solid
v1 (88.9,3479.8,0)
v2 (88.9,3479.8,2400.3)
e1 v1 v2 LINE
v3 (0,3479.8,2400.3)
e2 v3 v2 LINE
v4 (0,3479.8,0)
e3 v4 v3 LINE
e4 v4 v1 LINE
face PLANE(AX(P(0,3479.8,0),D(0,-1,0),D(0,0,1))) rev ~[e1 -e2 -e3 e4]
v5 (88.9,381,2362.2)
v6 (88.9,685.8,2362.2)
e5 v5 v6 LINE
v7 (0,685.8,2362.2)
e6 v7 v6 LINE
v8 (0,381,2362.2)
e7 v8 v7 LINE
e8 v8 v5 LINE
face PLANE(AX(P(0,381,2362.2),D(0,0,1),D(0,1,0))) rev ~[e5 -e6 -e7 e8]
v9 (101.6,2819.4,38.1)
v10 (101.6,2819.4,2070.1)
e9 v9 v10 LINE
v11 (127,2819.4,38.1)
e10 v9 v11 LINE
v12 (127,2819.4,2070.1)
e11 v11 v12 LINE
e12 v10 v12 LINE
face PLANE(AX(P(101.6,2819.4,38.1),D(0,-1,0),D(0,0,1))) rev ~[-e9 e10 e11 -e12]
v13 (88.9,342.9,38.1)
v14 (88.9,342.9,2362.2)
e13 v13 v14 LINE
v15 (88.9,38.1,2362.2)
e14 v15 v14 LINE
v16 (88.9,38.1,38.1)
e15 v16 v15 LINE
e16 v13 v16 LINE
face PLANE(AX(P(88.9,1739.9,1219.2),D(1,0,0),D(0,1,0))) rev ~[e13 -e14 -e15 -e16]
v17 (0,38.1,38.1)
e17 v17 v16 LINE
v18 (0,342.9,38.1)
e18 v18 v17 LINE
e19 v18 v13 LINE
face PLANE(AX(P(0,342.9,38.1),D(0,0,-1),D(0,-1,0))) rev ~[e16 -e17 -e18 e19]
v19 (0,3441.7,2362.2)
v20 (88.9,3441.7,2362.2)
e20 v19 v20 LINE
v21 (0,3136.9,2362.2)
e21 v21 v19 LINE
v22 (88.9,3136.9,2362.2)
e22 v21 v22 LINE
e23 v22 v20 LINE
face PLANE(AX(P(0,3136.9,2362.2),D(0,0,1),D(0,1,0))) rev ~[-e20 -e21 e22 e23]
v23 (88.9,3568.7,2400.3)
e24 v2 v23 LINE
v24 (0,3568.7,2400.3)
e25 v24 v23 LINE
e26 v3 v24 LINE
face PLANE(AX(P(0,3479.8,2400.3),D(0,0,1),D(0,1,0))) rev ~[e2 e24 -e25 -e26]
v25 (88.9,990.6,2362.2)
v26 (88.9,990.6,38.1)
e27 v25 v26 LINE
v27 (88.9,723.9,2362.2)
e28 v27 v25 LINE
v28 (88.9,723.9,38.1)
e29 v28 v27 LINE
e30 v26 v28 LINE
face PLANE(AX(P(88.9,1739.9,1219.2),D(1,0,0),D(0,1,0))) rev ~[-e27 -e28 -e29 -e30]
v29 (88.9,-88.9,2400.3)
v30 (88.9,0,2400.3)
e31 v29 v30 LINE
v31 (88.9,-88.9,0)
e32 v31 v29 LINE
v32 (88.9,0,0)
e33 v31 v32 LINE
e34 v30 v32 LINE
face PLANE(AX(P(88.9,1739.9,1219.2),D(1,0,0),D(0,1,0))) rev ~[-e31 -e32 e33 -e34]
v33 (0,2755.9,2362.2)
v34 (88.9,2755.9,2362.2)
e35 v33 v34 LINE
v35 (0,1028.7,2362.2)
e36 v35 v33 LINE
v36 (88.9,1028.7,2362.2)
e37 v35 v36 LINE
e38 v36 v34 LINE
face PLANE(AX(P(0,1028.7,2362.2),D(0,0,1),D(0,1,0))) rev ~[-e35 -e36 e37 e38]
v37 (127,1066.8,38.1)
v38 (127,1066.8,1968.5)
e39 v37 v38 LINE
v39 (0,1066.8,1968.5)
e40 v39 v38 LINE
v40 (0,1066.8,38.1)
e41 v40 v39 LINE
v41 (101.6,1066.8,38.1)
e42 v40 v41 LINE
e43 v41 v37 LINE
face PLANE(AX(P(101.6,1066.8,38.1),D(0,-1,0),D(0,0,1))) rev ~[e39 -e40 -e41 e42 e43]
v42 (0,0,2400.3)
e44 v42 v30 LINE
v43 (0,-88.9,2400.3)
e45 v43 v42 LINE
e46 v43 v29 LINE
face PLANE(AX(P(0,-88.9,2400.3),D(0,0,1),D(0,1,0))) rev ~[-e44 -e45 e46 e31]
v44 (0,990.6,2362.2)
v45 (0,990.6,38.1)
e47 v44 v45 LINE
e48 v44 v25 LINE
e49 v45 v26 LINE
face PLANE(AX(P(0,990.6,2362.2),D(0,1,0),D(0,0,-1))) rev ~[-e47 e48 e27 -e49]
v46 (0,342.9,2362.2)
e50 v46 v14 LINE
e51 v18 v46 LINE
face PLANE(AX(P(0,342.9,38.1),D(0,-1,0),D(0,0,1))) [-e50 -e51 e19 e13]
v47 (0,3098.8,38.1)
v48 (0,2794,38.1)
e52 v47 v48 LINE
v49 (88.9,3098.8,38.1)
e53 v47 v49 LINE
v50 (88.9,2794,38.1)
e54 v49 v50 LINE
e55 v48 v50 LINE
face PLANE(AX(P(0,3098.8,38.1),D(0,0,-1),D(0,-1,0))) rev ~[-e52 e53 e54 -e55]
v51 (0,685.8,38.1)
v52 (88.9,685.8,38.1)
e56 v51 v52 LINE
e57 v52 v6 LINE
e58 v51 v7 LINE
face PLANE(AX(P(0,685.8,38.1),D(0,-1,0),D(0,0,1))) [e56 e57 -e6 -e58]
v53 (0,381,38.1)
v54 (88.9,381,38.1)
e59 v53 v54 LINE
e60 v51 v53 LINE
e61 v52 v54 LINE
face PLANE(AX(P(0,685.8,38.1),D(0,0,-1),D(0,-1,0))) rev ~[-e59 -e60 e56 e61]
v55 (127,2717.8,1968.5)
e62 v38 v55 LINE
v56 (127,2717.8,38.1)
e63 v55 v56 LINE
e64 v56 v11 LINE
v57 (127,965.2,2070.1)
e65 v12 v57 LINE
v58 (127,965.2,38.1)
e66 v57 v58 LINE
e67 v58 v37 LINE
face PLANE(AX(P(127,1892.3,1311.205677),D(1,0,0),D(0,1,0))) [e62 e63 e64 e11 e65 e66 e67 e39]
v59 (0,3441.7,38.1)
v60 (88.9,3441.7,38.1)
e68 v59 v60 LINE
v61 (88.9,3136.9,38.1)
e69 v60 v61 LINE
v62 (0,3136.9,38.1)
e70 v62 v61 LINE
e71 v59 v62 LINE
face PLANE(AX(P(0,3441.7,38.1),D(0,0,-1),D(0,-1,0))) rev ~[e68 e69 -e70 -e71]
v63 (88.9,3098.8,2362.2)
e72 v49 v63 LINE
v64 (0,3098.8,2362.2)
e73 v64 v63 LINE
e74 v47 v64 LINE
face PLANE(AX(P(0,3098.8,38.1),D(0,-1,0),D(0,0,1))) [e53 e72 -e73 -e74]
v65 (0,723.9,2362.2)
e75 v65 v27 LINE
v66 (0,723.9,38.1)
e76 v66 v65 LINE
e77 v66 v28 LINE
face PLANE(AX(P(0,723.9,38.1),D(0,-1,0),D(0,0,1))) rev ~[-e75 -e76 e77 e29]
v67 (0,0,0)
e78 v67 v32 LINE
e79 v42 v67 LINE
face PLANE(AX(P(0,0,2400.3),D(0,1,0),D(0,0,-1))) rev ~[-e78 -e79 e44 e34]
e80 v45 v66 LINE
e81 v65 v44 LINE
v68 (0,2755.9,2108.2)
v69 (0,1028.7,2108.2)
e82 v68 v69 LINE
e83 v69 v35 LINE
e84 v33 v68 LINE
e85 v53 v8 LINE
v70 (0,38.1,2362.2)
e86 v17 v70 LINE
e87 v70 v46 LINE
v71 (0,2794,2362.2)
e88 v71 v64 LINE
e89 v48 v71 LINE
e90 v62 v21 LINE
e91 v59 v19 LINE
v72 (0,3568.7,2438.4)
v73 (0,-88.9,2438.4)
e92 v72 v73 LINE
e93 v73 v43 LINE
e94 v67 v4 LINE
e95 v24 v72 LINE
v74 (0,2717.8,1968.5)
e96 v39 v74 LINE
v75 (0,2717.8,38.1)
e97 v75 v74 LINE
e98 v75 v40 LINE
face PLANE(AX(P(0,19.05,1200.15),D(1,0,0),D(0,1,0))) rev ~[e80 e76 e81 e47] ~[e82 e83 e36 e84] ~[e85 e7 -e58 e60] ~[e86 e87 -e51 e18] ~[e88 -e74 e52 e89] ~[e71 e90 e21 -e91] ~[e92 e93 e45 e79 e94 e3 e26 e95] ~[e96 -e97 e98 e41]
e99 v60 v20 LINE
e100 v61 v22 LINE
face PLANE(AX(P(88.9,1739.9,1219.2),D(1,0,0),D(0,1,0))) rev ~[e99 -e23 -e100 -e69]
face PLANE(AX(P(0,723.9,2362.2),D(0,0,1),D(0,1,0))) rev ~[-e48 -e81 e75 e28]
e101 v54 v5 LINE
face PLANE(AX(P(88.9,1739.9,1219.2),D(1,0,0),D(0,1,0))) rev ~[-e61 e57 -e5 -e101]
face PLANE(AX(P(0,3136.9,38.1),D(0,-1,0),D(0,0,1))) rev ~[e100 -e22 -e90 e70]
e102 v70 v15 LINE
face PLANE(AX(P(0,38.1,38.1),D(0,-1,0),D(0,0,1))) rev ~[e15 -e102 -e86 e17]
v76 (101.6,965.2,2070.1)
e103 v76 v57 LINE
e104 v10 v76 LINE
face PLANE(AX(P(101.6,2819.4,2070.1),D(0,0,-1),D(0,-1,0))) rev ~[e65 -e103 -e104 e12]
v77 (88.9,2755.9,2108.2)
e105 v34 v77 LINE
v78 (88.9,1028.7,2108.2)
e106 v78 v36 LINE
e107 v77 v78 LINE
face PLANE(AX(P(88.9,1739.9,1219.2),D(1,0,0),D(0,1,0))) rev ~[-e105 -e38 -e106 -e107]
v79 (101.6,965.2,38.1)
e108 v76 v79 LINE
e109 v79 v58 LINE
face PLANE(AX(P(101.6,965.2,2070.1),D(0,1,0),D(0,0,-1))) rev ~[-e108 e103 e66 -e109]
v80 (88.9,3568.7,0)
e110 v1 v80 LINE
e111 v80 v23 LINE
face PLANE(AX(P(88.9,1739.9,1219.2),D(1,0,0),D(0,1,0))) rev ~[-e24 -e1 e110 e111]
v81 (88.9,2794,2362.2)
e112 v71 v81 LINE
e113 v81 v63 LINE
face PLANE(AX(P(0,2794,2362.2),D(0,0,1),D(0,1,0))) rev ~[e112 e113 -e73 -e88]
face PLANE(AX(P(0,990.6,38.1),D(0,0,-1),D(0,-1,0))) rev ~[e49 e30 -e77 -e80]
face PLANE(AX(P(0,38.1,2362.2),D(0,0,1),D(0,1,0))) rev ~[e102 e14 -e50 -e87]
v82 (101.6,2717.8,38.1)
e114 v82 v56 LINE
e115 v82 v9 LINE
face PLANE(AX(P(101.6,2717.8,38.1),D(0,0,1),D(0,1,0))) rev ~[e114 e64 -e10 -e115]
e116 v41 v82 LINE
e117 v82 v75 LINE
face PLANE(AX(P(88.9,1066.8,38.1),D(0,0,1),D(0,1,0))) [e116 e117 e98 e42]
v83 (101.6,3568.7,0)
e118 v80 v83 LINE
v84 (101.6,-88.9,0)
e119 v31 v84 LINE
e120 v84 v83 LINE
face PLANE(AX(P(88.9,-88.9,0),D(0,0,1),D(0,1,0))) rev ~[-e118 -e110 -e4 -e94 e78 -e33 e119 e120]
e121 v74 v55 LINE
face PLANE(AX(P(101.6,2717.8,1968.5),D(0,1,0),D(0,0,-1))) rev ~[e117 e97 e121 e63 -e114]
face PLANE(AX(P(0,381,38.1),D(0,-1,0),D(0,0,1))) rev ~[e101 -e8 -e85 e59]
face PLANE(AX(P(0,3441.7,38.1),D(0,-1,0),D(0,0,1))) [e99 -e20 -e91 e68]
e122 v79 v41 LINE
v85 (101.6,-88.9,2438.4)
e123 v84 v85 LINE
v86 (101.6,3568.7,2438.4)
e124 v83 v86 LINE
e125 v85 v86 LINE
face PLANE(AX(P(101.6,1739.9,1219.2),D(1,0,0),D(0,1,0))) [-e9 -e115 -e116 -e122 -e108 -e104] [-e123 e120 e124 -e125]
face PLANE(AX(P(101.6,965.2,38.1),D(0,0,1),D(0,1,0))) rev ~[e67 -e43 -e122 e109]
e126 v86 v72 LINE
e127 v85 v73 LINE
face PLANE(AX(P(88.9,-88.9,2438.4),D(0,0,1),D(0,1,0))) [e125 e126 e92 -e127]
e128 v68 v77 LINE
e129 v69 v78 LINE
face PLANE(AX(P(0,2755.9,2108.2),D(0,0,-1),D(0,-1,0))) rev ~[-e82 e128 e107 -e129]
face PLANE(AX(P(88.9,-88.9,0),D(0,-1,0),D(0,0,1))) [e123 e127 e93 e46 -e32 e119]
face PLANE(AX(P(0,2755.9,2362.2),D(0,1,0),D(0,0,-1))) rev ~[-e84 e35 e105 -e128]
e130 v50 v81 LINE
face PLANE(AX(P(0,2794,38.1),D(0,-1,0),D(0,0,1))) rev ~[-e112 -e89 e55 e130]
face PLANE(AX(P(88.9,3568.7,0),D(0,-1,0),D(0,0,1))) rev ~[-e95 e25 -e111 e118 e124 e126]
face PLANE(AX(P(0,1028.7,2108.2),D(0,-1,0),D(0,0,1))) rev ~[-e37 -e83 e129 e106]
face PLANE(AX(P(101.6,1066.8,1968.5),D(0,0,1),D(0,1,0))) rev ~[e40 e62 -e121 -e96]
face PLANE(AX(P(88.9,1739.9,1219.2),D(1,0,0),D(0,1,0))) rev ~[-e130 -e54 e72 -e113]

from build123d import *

# Parameters (mm, degrees)
F0_W     = 38.1
F0_H     = 2324.1
F0_H_2   = 1930.4
F1_DEPTH = 88.9
F2_W     = 3657.6
F2_H     = 2438.4
F2_W_2   = 1651
F2_H_2   = 1930.4
F3_DEPTH = 12.7
F5_DEPTH = 25.4


# Not quite as in the source:
# - a feature names something its author has since deleted; it is built from what else it names


with BuildPart() as f1:
    # F0 (on Right) → F1 (new body)
    with BuildSketch(Plane.YZ):
        with Locations((19.05, 1200.15)):
            Rectangle(F0_W, F0_H)
        with Locations((361.95, 1200.15)):
            Rectangle(F0_W, F0_H)
        Polygon((990.6, 2362.2), (990.6, 38.1), (1028.7, 38.1), (1028.7, 1968.5), (1028.7, 2108.2), (1028.7, 2362.2), align=None)
        with Locations((1047.75, 1003.3)):
            Rectangle(F0_W, F0_H_2)
        Polygon((2717.8, 1968.5), (2755.9, 1968.5), (2755.9, 2108.2), (1028.7, 2108.2), (1028.7, 1968.5), (1066.8, 1968.5), align=None)
        with Locations((2736.85, 1003.3)):
            Rectangle(F0_W, F0_H_2)
        Polygon((2755.9, 38.1), (2794, 38.1), (2794, 2362.2), (2755.9, 2362.2), (2755.9, 2108.2), (2755.9, 1968.5), align=None)
        with Locations((3460.75, 1200.15)):
            Rectangle(F0_W, F0_H)
        Polygon((0, 2400.3), (0, 2362.2), (38.1, 2362.2), (342.9, 2362.2), (381, 2362.2), (685.8, 2362.2), (723.9, 2362.2), (990.6, 2362.2), (1028.7, 2362.2), (2755.9, 2362.2), (2794, 2362.2), (3098.8, 2362.2), (3136.9, 2362.2), (3441.7, 2362.2), (3479.8, 2362.2), (3479.8, 2400.3), align=None)
        Polygon((-88.9, 2400.3), (0, 2400.3), (3479.8, 2400.3), (3568.7, 2400.3), (3568.7, 2438.4), (-88.9, 2438.4), align=None)
        Polygon((0, 38.1), (0, 0), (3479.8, 0), (3479.8, 38.1), (3441.7, 38.1), (3136.9, 38.1), (3098.8, 38.1), (2794, 38.1), (2755.9, 38.1), (2717.8, 38.1), (1066.8, 38.1), (1028.7, 38.1), (990.6, 38.1), (723.9, 38.1), (685.8, 38.1), (381, 38.1), (342.9, 38.1), (38.1, 38.1), align=None)
        with Locations((704.85, 1200.15)):
            Rectangle(F0_W, F0_H)
        with Locations((3117.85, 1200.15)):
            Rectangle(F0_W, F0_H)
    extrude(amount=F1_DEPTH)

    # F2 (on face) → F3 (join)
    with BuildSketch(Plane.YZ.offset(88.9)):
        with Locations((1739.9, 1219.2)):
            Rectangle(F2_W, F2_H)
        with Locations((1892.3, 1003.3)):
            Rectangle(F2_W_2, F2_H_2, mode=Mode.SUBTRACT)
    extrude(amount=F3_DEPTH)

    # F4 (on face) → F5 (join)
    with BuildSketch(Plane.YZ.offset(101.6)):
        Polygon((1066.8, 38.1), (1066.8, 1968.5), (2717.8, 1968.5), (2717.8, 38.1), (2819.4, 38.1), (2819.4, 2070.1), (965.2, 2070.1), (965.2, 38.1), align=None)
    extrude(amount=F5_DEPTH)


solid = f1.part
